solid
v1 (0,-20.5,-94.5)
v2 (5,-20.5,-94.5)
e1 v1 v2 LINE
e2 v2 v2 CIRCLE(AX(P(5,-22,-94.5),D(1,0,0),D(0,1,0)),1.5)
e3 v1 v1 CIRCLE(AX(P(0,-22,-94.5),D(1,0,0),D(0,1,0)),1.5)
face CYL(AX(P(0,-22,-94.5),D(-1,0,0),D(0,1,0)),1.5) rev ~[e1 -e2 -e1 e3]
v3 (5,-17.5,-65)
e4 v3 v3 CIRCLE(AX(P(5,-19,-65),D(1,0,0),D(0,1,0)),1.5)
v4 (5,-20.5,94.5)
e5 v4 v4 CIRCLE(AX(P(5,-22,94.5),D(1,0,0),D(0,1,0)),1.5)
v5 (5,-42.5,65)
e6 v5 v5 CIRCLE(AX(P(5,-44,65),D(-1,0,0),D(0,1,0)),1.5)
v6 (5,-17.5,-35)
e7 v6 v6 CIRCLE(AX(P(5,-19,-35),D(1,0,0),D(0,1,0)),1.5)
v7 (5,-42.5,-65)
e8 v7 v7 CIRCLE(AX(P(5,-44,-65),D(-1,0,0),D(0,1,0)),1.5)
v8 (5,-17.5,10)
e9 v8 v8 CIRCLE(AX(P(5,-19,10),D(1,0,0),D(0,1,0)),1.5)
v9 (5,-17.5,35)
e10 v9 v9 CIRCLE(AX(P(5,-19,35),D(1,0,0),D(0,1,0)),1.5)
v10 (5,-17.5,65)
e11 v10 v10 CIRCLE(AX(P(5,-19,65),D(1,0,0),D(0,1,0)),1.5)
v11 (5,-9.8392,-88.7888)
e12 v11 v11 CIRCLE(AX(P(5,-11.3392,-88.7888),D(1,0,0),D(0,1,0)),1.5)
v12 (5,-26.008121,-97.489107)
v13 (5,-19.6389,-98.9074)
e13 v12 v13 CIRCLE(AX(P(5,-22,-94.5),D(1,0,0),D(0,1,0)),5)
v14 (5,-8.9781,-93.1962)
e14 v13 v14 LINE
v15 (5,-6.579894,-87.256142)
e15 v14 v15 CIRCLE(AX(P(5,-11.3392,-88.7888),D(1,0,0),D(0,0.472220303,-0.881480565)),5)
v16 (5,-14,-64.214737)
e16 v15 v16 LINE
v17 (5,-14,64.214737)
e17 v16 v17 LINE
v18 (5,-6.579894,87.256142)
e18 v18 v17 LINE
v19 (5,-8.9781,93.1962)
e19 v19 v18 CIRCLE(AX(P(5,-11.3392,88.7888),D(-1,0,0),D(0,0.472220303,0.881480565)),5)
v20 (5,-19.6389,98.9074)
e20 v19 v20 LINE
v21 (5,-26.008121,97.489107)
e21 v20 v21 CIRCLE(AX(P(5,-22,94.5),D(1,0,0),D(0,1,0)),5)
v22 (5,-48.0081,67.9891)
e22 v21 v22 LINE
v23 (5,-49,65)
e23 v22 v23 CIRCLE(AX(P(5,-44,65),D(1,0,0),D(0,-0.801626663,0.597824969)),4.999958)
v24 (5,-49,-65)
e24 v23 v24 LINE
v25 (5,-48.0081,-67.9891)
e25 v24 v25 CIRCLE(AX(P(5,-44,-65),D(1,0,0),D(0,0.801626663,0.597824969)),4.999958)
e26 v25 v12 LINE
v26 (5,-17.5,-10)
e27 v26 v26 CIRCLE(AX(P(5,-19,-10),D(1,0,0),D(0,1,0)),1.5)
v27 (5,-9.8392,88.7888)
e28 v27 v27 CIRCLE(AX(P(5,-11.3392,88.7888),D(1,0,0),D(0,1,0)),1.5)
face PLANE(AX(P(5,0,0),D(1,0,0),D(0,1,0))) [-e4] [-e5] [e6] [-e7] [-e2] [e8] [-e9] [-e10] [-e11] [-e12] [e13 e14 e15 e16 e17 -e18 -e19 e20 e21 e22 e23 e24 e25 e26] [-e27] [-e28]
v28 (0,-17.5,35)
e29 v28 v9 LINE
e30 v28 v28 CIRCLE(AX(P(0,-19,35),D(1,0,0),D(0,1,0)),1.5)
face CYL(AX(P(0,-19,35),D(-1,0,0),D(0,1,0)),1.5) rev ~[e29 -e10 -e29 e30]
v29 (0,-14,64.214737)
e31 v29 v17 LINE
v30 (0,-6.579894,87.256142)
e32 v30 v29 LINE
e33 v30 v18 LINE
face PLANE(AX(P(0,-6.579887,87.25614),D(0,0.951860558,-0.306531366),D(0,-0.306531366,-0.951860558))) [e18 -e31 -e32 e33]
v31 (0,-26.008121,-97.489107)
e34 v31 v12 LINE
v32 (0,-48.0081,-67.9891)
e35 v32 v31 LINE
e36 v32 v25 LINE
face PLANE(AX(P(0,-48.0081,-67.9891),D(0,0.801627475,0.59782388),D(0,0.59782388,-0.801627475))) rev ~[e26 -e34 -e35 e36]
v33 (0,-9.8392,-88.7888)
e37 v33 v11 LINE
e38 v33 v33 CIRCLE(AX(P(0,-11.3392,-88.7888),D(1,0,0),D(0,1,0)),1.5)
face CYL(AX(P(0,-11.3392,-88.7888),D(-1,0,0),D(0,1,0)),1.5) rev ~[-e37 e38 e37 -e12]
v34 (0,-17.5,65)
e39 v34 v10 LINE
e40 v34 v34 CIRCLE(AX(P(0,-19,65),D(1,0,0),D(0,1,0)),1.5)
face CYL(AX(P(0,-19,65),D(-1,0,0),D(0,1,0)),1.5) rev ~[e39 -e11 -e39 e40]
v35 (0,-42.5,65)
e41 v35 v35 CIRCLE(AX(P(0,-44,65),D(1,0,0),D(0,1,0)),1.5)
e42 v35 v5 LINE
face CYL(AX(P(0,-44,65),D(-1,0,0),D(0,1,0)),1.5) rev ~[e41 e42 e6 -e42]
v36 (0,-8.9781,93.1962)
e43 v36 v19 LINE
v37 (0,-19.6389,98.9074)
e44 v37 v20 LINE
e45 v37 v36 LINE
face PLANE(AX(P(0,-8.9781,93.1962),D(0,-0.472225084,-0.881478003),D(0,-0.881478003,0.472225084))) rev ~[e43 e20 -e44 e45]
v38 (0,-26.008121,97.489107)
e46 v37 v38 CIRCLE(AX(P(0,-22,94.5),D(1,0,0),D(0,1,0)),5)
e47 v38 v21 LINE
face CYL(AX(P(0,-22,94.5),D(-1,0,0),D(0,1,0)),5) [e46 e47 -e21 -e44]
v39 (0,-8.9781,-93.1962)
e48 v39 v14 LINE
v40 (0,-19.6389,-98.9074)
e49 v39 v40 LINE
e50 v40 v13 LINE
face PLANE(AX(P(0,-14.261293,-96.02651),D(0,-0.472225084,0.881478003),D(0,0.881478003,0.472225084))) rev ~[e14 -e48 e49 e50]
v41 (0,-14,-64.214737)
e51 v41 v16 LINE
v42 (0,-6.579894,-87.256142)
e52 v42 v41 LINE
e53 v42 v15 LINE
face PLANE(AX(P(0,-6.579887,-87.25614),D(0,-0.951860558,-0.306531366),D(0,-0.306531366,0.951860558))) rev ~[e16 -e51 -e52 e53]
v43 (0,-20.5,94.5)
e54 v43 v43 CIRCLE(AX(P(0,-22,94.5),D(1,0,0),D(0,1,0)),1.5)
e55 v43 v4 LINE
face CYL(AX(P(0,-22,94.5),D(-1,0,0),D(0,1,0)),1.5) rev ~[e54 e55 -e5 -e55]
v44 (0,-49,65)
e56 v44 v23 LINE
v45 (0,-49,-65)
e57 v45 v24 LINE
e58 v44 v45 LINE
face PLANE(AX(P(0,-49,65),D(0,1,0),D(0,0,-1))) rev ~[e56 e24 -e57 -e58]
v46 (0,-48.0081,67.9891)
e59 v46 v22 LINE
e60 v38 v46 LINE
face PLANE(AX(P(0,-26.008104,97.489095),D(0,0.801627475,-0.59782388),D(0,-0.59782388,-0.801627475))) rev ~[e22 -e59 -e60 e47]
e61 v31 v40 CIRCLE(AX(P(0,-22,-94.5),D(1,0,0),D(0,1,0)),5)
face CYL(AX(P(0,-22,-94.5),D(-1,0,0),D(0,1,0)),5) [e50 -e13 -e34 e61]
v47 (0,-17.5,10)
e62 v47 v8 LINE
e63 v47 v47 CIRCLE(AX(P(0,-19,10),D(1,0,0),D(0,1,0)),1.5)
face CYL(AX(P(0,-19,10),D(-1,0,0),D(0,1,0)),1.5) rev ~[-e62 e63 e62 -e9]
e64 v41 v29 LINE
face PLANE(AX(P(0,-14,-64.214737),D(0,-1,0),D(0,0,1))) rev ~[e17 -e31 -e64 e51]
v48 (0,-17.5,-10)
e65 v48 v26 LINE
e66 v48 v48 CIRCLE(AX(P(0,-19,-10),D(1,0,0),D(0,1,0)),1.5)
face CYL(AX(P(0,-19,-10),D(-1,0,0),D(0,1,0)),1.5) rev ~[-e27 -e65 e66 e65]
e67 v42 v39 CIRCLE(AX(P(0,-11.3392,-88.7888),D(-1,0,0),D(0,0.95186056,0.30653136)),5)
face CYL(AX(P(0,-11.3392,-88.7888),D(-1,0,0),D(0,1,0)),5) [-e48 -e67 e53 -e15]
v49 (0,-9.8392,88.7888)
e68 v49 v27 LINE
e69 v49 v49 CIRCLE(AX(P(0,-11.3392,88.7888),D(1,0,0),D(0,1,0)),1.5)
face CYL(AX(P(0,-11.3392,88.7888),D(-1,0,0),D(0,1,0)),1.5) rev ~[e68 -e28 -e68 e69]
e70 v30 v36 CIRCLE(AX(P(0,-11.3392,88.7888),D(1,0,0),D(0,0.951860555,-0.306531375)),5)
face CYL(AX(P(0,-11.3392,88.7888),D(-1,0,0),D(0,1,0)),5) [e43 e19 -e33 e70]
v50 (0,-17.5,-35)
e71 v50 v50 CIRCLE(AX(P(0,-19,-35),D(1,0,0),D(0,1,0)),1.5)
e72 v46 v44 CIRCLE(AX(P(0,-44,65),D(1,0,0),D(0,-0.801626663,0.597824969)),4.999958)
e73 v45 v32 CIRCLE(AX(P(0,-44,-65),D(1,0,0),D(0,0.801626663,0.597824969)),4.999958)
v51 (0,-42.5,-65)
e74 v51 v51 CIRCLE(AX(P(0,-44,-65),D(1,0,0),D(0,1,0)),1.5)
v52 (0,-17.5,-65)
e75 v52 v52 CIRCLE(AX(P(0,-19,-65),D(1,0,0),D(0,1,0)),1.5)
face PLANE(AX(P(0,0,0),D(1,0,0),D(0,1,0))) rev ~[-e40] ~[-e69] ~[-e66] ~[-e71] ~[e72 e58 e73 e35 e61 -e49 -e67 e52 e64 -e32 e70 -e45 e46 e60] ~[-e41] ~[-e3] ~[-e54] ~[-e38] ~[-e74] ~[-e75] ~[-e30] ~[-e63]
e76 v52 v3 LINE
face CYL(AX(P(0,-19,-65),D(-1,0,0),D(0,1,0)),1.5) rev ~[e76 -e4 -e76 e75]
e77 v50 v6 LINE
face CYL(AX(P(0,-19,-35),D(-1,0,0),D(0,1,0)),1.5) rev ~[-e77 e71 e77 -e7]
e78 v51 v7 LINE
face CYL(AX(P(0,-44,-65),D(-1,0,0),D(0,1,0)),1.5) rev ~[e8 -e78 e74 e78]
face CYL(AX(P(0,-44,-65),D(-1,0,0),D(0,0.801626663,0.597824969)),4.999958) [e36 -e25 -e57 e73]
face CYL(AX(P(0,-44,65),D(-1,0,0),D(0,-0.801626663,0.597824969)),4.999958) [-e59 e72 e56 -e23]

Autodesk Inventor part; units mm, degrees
ref_plane "YZ Plane" through (0, 0, 0) normal (1, 0, 0) x (0, 1, 0)
ref_plane "XZ Plane" through (0, 0, 0) normal (0, 1, 0) x (-1, 0, 0)
ref_plane "XY Plane" through (0, 0, 0) normal (0, 0, 1) x (1, 0, 0)
sketch "Sketch1" plane through (0, 0, 0) normal (1, 0, 0) x (0, 1, 0)
  circle A0 centre (0, -124) radius 1.95
  circle A1 centre (0, 124) radius 1.95
  circle A2 centre (-19, -65) radius 1.5
  circle A3 centre (-19, 65) radius 1.5
  line L0 (0, 124) -> (-19, 65) construction
  line L1 (4.7593, 122.4673) -> (-14.2407, 63.4673)
  line L2 (-23.7593, 66.5327) -> (-4.7593, 125.5327)
  arc A4 (4.7593, 122.4673) -> (-4.7593, 125.5327) centre (0, 124) ccw
  arc A5 (-23.7593, 66.5327) -> (-14.2407, 63.4673) centre (-19, 65) ccw
  line L3 (-19, 65) -> (-19, -65) construction
  line L4 (-24, 65) -> (-24, -65)
  line L5 (-14, -65) -> (-14, 65)
  arc A6 (-14, 65) -> (-24, 65) centre (-19, 65) ccw
  arc A7 (-24, -65) -> (-14, -65) centre (-19, -65) ccw
  line L6 (-19, -65) -> (0, -124) construction
  line L7 (-23.7593, -66.5327) -> (-4.7593, -125.5327)
  line L8 (4.7593, -122.4673) -> (-14.2407, -63.4673)
  arc A8 (-14.2407, -63.4673) -> (-23.7593, -66.5327) centre (-19, -65) ccw
  arc A9 (-4.7593, -125.5327) -> (4.7593, -122.4673) centre (0, -124) ccw
  circle A10 centre (-44, 65) radius 1.5
  circle A11 centre (-44, -65) radius 1.5
  line L9 (-19, 65) -> (-44, 65) construction
  line L10 (-19, 67) -> (-44, 67)
  line L11 (-44, 63) -> (-19, 63)
  arc A12 (-19, 63) -> (-19, 67) centre (-19, 65) ccw
  arc A13 (-44, 67) -> (-44, 63) centre (-44, 65) ccw
  line L12 (-19, -65) -> (-44, -65) construction
  line L13 (-19, -63) -> (-44, -63)
  line L14 (-44, -67) -> (-19, -67)
  arc A14 (-19, -67) -> (-19, -63) centre (-19, -65) ccw
  arc A15 (-44, -63) -> (-44, -67) centre (-44, -65) ccw
  line L15 (0, 124) -> (-44, 65) construction
  line L16 (-4.0081, 126.9891) -> (-48.0081, 67.9891)
  line L17 (-39.9919, 62.0109) -> (4.0081, 121.0109)
  arc A16 (4.0081, 121.0109) -> (-4.0081, 126.9891) centre (0, 124) ccw
  arc A17 (-48.0081, 67.9891) -> (-39.9919, 62.0109) centre (-44, 65) ccw
  line L18 (-44, -65) -> (0, -124) construction
  line L19 (-48.0081, -67.9891) -> (-4.0081, -126.9891)
  line L20 (4.0081, -121.0109) -> (-39.9919, -62.0109)
  arc A18 (-39.9919, -62.0109) -> (-48.0081, -67.9891) centre (-44, -65) ccw
  arc A19 (-4.0081, -126.9891) -> (4.0081, -121.0109) centre (0, -124) ccw
  line L21 (-44, 65) -> (-44, -65) construction
  line L22 (-49, 65) -> (-49, -65)
  line L23 (-39, -65) -> (-39, 65)
  arc A20 (-39, 65) -> (-49, 65) centre (-44, 65) ccw
  arc A21 (-49, -65) -> (-39, -65) centre (-44, -65) ccw
  line L24 (-44, 65) -> (-19, 0) construction
  line L25 (-45.4, 64.4615) -> (-20.4, -0.5385)
  line L26 (-17.6, 0.5385) -> (-42.6, 65.5385)
  arc A22 (-42.6, 65.5385) -> (-45.4, 64.4615) centre (-44, 65) ccw
  arc A23 (-20.4, -0.5385) -> (-17.6, 0.5385) centre (-19, 0) ccw
  line L27 (-44, -65) -> (-19, 0) construction
  line L28 (-42.6, -65.5385) -> (-17.6, -0.5385)
  line L29 (-20.4, 0.5385) -> (-45.4, -64.4615)
  arc A24 (-45.4, -64.4615) -> (-42.6, -65.5385) centre (-44, -65) ccw
  arc A25 (-17.6, -0.5385) -> (-20.4, 0.5385) centre (-19, 0) ccw
  line L30 (-19, 0) -> (-44, 0) construction
  line L31 (-19, 1.5) -> (-44, 1.5)
  line L32 (-44, -1.5) -> (-19, -1.5)
  arc A26 (-19, -1.5) -> (-19, 1.5) centre (-19, 0) ccw
  arc A27 (-44, 1.5) -> (-44, -1.5) centre (-44, 0) ccw
  circle A28 centre (-19, -10) radius 1.5
  circle A29 centre (-19, -35) radius 1.5
  circle A30 centre (-19, 10) radius 1.5
  circle A31 centre (-19, 35) radius 1.5
  circle A32 centre (0, -124) radius 12.5
  circle A33 centre (0, 124) radius 12.5
  circle A34 centre (-22, 94.5) radius 1.5
  circle A35 centre (-22, -94.5) radius 1.5
  circle A36 centre (-11.3392, 88.7888) radius 1.5
  circle A37 centre (-11.3392, -88.7888) radius 1.5
  circle A38 centre (-11.3392, 88.7888) radius 5
  circle A39 centre (-22, 94.5) radius 5
  circle A40 centre (-11.3392, -88.7888) radius 5
  circle A41 centre (-22, -94.5) radius 5
  circle A42 centre (-19, 65) radius 4
  circle A43 centre (-44, 65) radius 4
  circle A44 centre (-19, -65) radius 4
  circle A45 centre (-44, -65) radius 4
  circle A46 centre (-19, 0) radius 1
  line L33 (-22, 94.5) -> (-11.3392, 88.7888) construction
  line L34 (-24.3611, 90.0926) -> (-13.7003, 84.3814)
  line L35 (-8.9781, 93.1962) -> (-19.6389, 98.9074)
  arc A47 (-19.6389, 98.9074) -> (-24.3611, 90.0926) centre (-22, 94.5) ccw
  arc A48 (-13.7003, 84.3814) -> (-8.9781, 93.1962) centre (-11.3392, 88.7888) ccw
  line L36 (-11.3392, -88.7888) -> (-22, -94.5) construction
  line L37 (-13.7003, -84.3814) -> (-24.3611, -90.0926)
  line L38 (-19.6389, -98.9074) -> (-8.9781, -93.1962)
  arc A49 (-8.9781, -93.1962) -> (-13.7003, -84.3814) centre (-11.3392, -88.7888) ccw
  arc A50 (-24.3611, -90.0926) -> (-19.6389, -98.9074) centre (-22, -94.5) ccw
  circle A51 centre (0, -124) radius 15
  circle A52 centre (0, 124) radius 15
  point P0 (0, 0)
  point P1 (-9.5, 94.5)
  point P2 (-9.5, -94.5)
  point P3 (-14, -64.2148)
  point P4 (-14, 64.2148)
  point P5 (-24, 65)
  point P6 (-23.7593, -66.5327)
  point P7 (-31.5, 65)
  point P8 (-31.5, -65)
  point P9 (-44, 0)
  point P10 (-31.5, 32.5)
  point P11 (-31.5, -32.5)
  point P12 (-39, 47.8215)
  point P13 (-24, 8.8215)
  point P14 (-24, 17.1785)
  point P15 (-41.6236, 63)
  point P16 (-24, 63)
  point P17 (-23.6088, 67)
  point P18 (-36.2712, 67)
  point P19 (-13.9854, 96.8832)
  point P20 (-6.8749, 118.9633)
  point P21 (-43.3898, 70)
  point P22 (-46.5, 65)
  point P23 (-46.5, -65)
  point P24 (-43.3898, -70)
  point P25 (-6.8749, -118.9633)
  point P26 (-13.9854, -96.8832)
  point P27 (-36.2712, -67)
  point P28 (-23.6088, -67)
  point P29 (-24, -63)
  point P30 (-41.6236, -63)
  point P31 (-24, -17.1785)
  point P32 (-24, -8.8215)
  point P33 (-39, -47.8215)
  point P34 (-31.5, 0)
  point P35 (-39, -1.5)
  point P36 (-24, -1.5)
  point P37 (-24, 1.5)
  point P38 (-39, 1.5)
  point P39 (-49, -65)
  point P40 (-24, -65)
  point P41 (-4.0081, -126.9891)
  point P42 (-4.0081, 126.9891)
  point P43 (-14.2407, -63.4673)
  point P44 (-4.0081, 126.9891)
  point P45 (-14.2407, 63.4673)
  point P46 (4.7593, 122.4673)
  point P47 (-14.2407, -63.4673)
  point P48 (-39, 63)
  point P49 (-23.5826, 67)
  point P50 (-14, 65)
  point P51 (-39, -63)
  point P52 (-39, -56.1785)
  point P53 (-39, 56.1785)
  point P54 (-10.8571, -117.8053)
  point P55 (1.2475, -111.5624)
  point P56 (-10.8571, 117.8053)
  point P57 (1.2475, 111.5624)
  point P58 (-40.8878, -61.0867)
  point P59 (-41.5, 60.6699)
  point P60 (-23.7593, 66.5327)
  point P61 (-16.0985, -90.3215)
  point P62 (-6.5799, -87.2562)
  point P63 (-6.5799, 87.2562)
  point P64 (-16.0985, 90.3215)
  point P65 (-17.9919, 91.5109)
  point P66 (-26.0081, 97.4891)
  point P67 (-26.0081, -97.4891)
  point P68 (-17.9919, -91.5109)
  point P69 (-16.5, -61.8775)
  point P70 (-15.6632, -67.2059)
  point P71 (-22.4641, -67)
  point P72 (-20.4225, -68.7385)
  point P73 (-21.5, -61.8775)
  point P74 (-22.4641, -63)
  point P75 (-40.5359, -63)
  point P76 (-41.2689, -62.0775)
  point P77 (-46.5, -61.8775)
  point P78 (-44.1374, -68.9976)
  point P79 (-41.2689, 62.0775)
  point P80 (-40.5359, 63)
  point P81 (-44.1374, 68.9976)
  point P82 (-46.5, 61.8775)
  point P83 (-22.4641, 63)
  point P84 (-21.5, 61.8775)
  point P85 (-20.4225, 68.7385)
  point P86 (-22.4641, 67)
  point P87 (-16.5, 61.8775)
  point P88 (-15.6632, 67.2059)
  point P89 (-16.6696, 91.6444)
  point P90 (-16.6696, -91.6444)
  point P91 (-19.6389, 98.9074)
  point P92 (-20.5658, 88.0594)
  point P93 (-17.3771, 86.3511)
  point P94 (-8.9781, 93.1962)
  point P95 (-8.9781, -93.1962)
  point P96 (-17.3771, -86.3511)
  point P97 (-20.5658, -88.0594)
  point P98 (-19.6389, -98.9074)
  point P99 (-24, -65)
  point P100 (-23.5826, -63)
  point P101 (-23.5826, -67)
  point P102 (-39, -63.3409)
  point P103 (-44.9251, 63.2268)
  point P104 (-39, 63.3409)
  point P105 (-23.5826, 63)
  point P106 (-24, 65)
  point P107 (-14.2613, -96.0265)
  point P108 (-14.2613, 96.0265)
  point P109 (-40.5359, 67)
  point P110 (-40.5359, -67)
  point P111 (0.4243, 109.006)
  point P112 (-12.4626, 115.6524)
  point P113 (-14.5206, 96.1655)
  point P114 (-12.4626, -115.6524)
  point P115 (0.4243, -109.006)
  point P116 (-14.5206, -96.1655)
  dimension "d2" = 3.9
  dimension "d4" = 3.9
  dimension "d25" = 3
  dimension "d28" = 3
  dimension "d43" = 59
  dimension "d44" = 65
  dimension "d45" = 65
  dimension "d47" = 59
  dimension "d48" = 10
  dimension "d49" = 10
  dimension "d50" = 10
  dimension "d53" = 3
  dimension "d54" = 3
  dimension "d55" = 4
  dimension "d56" = 4
  dimension "d57" = 25
  dimension "d58" = 25
  dimension "d59" = 10
  dimension "d60" = 10
  dimension "d61" = 10
  dimension "d62" = 3
  dimension "d63" = 3
  dimension "d64" = 3
  dimension "d65" = 3
  dimension "d66" = 3
  dimension "d67" = 10
  dimension "d68" = 25
  dimension "d69" = 3
  dimension "d70" = 3
  dimension "d71" = 10
  dimension "d72" = 25
  dimension "d73" = 25
  dimension "d74" = 25
  dimension "d76" = 3
  dimension "d78" = 3
  dimension "d79" = 3
  dimension "d80" = 3
  dimension "d81" = 6
  dimension "d82" = 6
  dimension "d83" = 19
  dimension "d84" = 8
  dimension "d85" = 8
  dimension "d86" = 8
  dimension "d87" = 8
  dimension "d88" = 2
  dimension "d89" = 10
  dimension "d90" = 10
  dimension "d91" = 30
  dimension "d92" = 30
extrude "Extrusion1" add sketch "Sketch1" along normal blind 5 contours L1 L5 A6 L10 L2 L34 A38 | A38 | L5 L8 A8 L13 L4 L28 A23 L26 L11 A5 L1 | L1 A5 L11 A42 L10 A6 L5 | L34 L2 A38 | A39 L34 L17 L10 A20 L16 | A39 | L8 A40 L37 L7 L14 A7 L5 | L5 A7 L14 A44 L13 A8 L8 | L2 L34 L17 L35 | L2 L35 A38 | L2 L10 L17 L34 | L17 A39 L35 | A20 L10 A43 L25 A17 | A39 L17 L34 | L11 L4 A5 | A5 A6 L10 A42 L11 | A40 | A6 L2 L10 | L2 A5 L4 L11 L23 L17 L10 | A17 L25 L23 L31 A27 L32 L29 A18 L22 | A20 L23 L17 L11 A43 L10 | L10 L17 L23 A20 | L4 L26 L23 L11 | A42 L10 A12 L11 | L11 A12 L10 A42 | L14 L7 A7 | A7 A8 L13 A44 L14 | A40 L7 L37 | A8 L4 L13 | L25 A43 L26 A17 | A17 L26 L23 L25 | A18 L29 A45 L14 A21 | A43 L11 L26 A10 L25 A13 L10 | L10 A13 L25 A43 | L26 A25 L31 L25 L4 | L4 L25 L23 L26 | L23 L26 A17 L17 L11 | L11 L17 L23 | L7 L14 L20 L23 L13 L4 A7 | L7 L37 L20 L14 | A44 L13 A14 L14 | L14 A14 L13 A44 | L38 L7 A40 | L7 L38 L20 L37 | L13 L23 L28 L4 | L26 A43 L11 L17 A17 | L25 A13 L11 L26 A43 | L25 L4 L31 L23 | A21 L14 L20 L37 A41 L19 | L29 L23 L28 A18 | A18 L28 A45 L29 | L25 L31 L4 | A23 L25 L29 A25 | L14 A21 L23 L20 | L20 A41 L37 | L28 L23 L29 L4 | L4 L29 L32 A23 L28 | L23 L20 L13 | L13 L20 A18 L28 L23 | L26 L11 A43 | L25 A10 L26 L11 A13 | L31 L4 L32 L23 | L23 L32 A27 L31 | A41 | L14 A45 L13 L20 L23 A21 | A18 L20 L13 A45 L28 | L23 L32 L4 L29 | A45 L28 L13 A15 L29 | L29 A15 L14 A45 | L31 L25 L29 L32 L4 | L31 A25 L29 L25 | L38 A41 L20 | L4 L32 L29 | L14 A15 L29 A11 L28 L13 A45 | A45 L13 L28 | A15 L13 L28 A11 L29 | L25 A23 L32 L29 | A46
sketch "Sketch8" plane through (5, 0, 0) normal (1, 0, 0) x (0, 0, -1)
  circle A0 centre (-94.5, -22) radius 1.5 projected
  circle A1 centre (94.5, -22) radius 1.5 projected
  line L0 (97.4891, -26.0081) -> (67.9891, -48.0081) projected
  line L1 (-67.9891, -48.0081) -> (-97.4891, -26.0081) projected
  arc A2 (65, -49) -> (67.9891, -48.0081) centre (65, -44) ccw projected
  line L2 (65, -49) -> (-65, -49) projected
  arc A3 (-67.9891, -48.0081) -> (-65, -49) centre (-65, -44) ccw projected
  line L3 (-87.2562, -6.5799) -> (-64.2148, -14) projected
  line L4 (-64.2148, -14) -> (64.2148, -14) projected
  line L5 (64.2148, -14) -> (87.2562, -6.5799) projected
  circle A4 centre (65, -44) radius 1.5 projected
  circle A5 centre (-65, -19) radius 1.5 projected
  circle A6 centre (65, -19) radius 1.5 projected
  circle A7 centre (88.7888, -11.3392) radius 1.5 projected
  circle A8 centre (-88.7888, -11.3392) radius 1.5 projected
  circle A9 centre (-65, -44) radius 1.5 projected
  arc A10 (-87.2562, -6.5799) -> (-93.1962, -8.9781) centre (-88.7888, -11.3392) ccw projected
  arc A11 (93.1962, -8.9781) -> (87.2562, -6.5799) centre (88.7888, -11.3392) ccw projected
  line L6 (93.1962, -8.9781) -> (98.9074, -19.6389) projected
  arc A12 (97.4891, -26.0081) -> (98.9074, -19.6389) centre (94.5, -22) ccw projected
  arc A13 (-98.9074, -19.6389) -> (-97.4891, -26.0081) centre (-94.5, -22) ccw projected
  line L7 (-98.9074, -19.6389) -> (-93.1962, -8.9781) projected
  circle A14 centre (10, -19) radius 1.5 projected
  circle A15 centre (35, -19) radius 1.5 projected
  circle A16 centre (-10, -19) radius 1.5 projected
  circle A17 centre (-35, -19) radius 1.5 projected
  point P0 (0, 0)
properties part number "Horizontal_bar_support_V2"
